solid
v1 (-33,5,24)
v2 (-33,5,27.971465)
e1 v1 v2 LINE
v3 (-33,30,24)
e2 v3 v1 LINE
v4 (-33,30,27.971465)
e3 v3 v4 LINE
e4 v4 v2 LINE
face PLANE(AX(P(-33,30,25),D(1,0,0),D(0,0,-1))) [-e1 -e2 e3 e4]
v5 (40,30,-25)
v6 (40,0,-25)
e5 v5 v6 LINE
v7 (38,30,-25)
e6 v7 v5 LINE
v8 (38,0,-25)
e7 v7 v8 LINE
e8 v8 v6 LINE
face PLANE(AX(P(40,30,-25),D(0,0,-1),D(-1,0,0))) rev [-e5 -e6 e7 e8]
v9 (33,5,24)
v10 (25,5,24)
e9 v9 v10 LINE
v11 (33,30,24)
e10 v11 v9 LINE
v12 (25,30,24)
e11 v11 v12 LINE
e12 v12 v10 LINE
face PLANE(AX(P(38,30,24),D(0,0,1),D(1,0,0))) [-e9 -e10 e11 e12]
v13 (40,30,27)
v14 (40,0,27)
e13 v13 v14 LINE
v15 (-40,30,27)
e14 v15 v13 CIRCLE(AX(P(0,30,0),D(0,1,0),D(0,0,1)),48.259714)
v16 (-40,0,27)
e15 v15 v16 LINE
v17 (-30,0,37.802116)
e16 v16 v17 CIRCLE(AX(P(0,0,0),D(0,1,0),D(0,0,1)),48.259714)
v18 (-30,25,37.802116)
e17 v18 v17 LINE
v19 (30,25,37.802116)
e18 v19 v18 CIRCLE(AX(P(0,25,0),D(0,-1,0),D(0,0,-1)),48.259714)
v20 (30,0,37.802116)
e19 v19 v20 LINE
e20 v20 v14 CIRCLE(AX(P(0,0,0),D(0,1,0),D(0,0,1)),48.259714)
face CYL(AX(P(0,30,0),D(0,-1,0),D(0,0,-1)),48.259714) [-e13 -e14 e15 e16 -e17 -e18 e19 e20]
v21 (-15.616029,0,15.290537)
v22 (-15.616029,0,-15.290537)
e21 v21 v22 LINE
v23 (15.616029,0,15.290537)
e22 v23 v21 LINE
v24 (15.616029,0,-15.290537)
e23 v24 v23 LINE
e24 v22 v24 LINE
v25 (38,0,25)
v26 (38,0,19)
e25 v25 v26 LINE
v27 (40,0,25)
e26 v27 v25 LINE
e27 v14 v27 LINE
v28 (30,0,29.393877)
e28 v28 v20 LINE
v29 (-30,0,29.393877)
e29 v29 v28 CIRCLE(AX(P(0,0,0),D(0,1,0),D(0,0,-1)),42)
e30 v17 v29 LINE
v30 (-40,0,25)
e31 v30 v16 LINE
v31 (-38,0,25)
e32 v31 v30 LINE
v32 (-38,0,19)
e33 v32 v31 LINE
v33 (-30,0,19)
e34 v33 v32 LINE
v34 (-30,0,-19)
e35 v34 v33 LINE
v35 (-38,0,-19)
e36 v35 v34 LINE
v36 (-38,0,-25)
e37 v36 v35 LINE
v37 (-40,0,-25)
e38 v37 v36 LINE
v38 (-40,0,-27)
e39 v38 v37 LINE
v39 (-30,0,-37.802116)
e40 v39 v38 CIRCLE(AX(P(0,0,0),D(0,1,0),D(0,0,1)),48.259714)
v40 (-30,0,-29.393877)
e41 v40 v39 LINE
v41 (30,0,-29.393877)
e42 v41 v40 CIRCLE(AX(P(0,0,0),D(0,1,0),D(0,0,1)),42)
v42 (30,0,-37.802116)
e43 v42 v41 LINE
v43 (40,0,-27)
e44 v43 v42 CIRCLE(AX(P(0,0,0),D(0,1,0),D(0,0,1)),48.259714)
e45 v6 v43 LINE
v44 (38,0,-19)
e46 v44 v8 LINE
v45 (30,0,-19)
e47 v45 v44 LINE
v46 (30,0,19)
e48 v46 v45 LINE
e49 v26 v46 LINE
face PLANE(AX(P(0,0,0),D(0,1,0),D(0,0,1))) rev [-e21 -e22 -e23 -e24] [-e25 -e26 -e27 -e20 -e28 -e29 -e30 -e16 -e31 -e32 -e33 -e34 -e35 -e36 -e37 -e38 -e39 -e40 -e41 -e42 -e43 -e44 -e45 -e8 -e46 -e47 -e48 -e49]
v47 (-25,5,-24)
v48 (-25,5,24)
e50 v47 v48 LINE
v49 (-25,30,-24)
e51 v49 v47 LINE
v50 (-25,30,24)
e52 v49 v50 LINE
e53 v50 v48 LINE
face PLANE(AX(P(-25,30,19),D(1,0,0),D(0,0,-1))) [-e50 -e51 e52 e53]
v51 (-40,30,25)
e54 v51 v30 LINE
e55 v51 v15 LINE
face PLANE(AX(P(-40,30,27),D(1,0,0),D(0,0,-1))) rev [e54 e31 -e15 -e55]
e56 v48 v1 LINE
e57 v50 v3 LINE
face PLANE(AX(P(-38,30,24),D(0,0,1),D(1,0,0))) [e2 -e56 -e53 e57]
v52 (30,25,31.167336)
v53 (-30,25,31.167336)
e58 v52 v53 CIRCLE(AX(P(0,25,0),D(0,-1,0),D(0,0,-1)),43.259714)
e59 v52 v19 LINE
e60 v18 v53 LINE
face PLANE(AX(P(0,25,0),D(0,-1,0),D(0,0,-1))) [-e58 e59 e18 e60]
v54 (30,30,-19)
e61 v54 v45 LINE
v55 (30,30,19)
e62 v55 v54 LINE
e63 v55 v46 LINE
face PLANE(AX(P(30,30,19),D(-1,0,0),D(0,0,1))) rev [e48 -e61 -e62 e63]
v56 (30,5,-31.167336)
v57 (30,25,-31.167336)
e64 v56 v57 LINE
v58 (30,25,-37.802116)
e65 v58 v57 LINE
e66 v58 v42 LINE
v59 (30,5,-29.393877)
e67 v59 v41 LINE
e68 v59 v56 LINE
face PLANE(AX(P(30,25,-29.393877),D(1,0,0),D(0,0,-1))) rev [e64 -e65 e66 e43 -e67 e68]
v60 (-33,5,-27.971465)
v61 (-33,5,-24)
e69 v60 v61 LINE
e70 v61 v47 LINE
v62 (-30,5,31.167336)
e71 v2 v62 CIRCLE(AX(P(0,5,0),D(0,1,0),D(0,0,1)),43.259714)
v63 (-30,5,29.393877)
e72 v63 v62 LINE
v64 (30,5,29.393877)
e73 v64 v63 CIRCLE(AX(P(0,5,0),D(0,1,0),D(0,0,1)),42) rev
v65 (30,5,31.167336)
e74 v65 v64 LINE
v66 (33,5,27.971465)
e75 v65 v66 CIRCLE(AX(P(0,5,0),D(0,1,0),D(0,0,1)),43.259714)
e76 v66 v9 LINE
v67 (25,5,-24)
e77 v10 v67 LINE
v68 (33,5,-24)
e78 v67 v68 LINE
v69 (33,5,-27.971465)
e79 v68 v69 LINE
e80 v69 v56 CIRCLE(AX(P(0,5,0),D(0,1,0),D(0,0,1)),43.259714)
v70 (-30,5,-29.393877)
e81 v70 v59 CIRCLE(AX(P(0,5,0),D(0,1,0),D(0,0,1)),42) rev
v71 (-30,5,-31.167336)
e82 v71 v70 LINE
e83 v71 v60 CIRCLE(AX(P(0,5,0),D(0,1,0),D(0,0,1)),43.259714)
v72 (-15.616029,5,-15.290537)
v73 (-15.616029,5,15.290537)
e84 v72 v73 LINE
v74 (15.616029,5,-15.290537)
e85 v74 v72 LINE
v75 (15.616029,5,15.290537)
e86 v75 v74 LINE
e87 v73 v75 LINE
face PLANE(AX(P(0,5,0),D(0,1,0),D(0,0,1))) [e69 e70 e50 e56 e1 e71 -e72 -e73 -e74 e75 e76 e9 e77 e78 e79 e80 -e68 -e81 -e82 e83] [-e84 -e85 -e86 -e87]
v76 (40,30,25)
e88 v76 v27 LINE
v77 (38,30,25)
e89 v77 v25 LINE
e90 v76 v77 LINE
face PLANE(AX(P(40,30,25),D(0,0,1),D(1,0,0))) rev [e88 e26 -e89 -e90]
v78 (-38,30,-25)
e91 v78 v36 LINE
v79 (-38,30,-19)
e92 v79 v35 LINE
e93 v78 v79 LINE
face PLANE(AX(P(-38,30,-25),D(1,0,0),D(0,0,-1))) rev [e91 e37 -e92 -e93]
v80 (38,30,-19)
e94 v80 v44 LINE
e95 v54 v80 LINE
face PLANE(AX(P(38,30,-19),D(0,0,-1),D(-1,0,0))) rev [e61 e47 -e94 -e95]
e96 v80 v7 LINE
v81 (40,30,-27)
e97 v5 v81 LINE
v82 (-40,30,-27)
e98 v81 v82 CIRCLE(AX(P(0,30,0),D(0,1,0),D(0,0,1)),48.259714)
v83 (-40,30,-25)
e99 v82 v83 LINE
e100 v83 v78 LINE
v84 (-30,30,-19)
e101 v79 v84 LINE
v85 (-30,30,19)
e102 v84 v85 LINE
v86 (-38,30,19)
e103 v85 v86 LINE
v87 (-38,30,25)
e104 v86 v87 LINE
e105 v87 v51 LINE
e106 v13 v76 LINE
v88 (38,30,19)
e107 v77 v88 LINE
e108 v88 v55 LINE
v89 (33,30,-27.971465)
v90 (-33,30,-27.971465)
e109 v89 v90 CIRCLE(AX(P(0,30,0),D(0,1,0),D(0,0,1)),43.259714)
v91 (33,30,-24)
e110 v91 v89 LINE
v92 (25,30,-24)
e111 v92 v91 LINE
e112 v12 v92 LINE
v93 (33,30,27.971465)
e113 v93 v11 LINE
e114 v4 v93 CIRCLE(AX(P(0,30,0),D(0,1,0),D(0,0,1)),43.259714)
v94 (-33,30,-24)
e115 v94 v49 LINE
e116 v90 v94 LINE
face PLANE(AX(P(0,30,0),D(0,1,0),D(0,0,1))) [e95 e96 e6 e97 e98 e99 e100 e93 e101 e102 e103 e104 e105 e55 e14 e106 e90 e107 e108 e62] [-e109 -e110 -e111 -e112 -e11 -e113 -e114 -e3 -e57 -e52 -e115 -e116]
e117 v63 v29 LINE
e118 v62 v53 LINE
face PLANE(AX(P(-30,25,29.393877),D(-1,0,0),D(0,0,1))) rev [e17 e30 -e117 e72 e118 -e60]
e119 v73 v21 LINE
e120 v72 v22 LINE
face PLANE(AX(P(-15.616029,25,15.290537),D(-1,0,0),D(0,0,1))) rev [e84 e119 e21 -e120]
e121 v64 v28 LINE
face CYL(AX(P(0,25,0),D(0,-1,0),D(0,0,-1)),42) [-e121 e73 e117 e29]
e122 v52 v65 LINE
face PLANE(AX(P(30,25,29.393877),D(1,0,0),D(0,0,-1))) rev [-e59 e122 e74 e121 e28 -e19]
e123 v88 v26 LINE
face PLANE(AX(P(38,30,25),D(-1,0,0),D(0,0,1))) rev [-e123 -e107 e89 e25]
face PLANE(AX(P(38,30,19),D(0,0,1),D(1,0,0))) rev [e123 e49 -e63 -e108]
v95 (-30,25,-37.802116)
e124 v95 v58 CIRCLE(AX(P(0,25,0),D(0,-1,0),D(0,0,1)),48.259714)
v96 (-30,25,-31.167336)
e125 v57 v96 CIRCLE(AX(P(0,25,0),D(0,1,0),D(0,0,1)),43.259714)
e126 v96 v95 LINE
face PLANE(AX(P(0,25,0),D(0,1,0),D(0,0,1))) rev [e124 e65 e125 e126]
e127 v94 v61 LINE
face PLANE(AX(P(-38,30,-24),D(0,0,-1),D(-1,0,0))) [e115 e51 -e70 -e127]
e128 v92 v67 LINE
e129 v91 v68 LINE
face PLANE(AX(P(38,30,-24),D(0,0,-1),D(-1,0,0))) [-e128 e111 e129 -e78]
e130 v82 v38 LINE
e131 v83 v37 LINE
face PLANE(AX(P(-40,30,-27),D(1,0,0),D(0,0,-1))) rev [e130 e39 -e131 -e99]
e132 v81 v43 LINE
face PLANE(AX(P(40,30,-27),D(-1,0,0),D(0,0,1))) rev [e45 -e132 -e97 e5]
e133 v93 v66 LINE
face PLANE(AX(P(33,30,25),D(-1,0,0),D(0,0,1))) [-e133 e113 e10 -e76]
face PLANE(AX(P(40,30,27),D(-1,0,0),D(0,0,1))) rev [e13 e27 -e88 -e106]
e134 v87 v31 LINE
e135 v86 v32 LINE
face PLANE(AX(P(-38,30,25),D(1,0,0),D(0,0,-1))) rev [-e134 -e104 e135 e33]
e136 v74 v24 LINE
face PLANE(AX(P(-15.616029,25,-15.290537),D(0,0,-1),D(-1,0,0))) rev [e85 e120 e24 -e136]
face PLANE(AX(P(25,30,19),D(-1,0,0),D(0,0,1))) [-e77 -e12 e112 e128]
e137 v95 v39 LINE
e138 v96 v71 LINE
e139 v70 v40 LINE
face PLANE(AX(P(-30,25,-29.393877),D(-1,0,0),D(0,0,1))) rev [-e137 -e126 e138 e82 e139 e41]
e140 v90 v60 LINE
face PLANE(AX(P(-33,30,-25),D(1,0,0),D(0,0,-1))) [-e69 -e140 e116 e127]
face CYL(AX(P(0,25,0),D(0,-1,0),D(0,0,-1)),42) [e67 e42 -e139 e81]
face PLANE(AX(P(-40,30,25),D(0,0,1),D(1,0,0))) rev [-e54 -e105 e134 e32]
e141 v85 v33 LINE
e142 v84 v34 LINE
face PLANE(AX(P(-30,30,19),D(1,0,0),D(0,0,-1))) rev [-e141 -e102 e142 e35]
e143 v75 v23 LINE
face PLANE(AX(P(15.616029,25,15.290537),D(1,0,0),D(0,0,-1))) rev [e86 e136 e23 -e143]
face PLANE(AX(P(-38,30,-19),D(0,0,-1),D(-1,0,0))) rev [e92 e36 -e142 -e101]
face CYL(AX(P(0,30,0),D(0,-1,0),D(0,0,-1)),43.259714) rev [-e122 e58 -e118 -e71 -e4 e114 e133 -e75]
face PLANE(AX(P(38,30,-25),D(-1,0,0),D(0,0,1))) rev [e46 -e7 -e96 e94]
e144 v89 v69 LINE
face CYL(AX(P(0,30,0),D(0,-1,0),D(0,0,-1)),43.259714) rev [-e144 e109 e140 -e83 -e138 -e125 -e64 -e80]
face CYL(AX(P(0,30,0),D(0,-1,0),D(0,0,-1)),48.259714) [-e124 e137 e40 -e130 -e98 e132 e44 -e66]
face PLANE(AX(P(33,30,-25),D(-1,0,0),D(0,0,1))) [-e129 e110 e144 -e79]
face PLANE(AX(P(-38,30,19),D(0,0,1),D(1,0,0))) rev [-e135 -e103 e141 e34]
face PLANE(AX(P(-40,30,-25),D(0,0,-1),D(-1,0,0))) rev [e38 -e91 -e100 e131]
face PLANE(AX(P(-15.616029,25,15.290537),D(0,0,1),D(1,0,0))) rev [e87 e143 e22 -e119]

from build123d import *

# Parameters (mm, degrees)
EXTRUDE_1_DEPTH     = 30
SHELL_START         = 5
SHELL_1_DEPTH       = 25
SKETCH_3_W          = 31.232058984
SKETCH_3_H          = 30.58107444
CUT_EXTRUDE_1_DEPTH = 25


# Read off the part's stored shape, not the designer's step: 抽壳1
with BuildPart() as part:
    # 草图1 → 凸台-拉伸1 (new body)
    with BuildSketch(Plane(origin=(0, 0, 0), x_dir=(1, 0, 0), z_dir=(0, 1, 0))):
        with BuildLine():
            Line((-40, -27), (-40, -25))
            Line((-40, -25), (-38, -25))
            Line((-38, -25), (-38, -19))
            Line((-38, -19), (-30, -19))
            Line((-30, -19), (-30, 19))
            Line((-30, 19), (-38, 19))
            Line((-38, 19), (-38, 25))
            Line((-38, 25), (-40, 25))
            Line((-40, 25), (-40, 27))
            ThreePointArc((-40, 27), (0, 48.259714048), (40, 27))
            Line((40, 27), (40, 25))
            Line((40, 25), (38, 25))
            Line((38, 25), (38, 19))
            Line((38, 19), (30, 19))
            Line((30, 19), (30, -19))
            Line((30, -19), (38, -19))
            Line((38, -19), (38, -25))
            Line((38, -25), (40, -25))
            Line((40, -25), (40, -27))
            ThreePointArc((40, -27), (0, -48.259714048), (-40, -27))
        make_face()
    extrude(amount=EXTRUDE_1_DEPTH)

    # 抽壳1 outline → 抽壳1 (cut)
    with BuildSketch(Plane(origin=(0, 0, 0), x_dir=(1, 0, 0), z_dir=(0, 1, 0)).offset(SHELL_START)):
        with BuildLine():
            Line((-33, -24), (-33, -27.971465094))
            ThreePointArc((-33, -27.971465094), (0, -43.259714048), (33, -27.971465094))
            Line((33, -27.971465094), (33, -24))
            Line((33, -24), (25, -24))
            Line((25, -24), (25, 24))
            Line((25, 24), (33, 24))
            Line((33, 24), (33, 27.971465094))
            ThreePointArc((33, 27.971465094), (0, 43.259714048), (-33, 27.971465094))
            Line((-33, 27.971465094), (-33, 24))
            Line((-33, 24), (-25, 24))
            Line((-25, 24), (-25, -24))
            Line((-25, -24), (-33, -24))
        make_face()
    extrude(amount=SHELL_1_DEPTH, mode=Mode.SUBTRACT)

    # 草图3 → 切除-拉伸1 (cut)
    with BuildSketch(Plane.XZ):
        with BuildLine():
            Line((-30, 29.393876913), (-30, 37.802116343))
            ThreePointArc((-30, 37.802116343), (0, 48.259714048), (30, 37.802116343))
            Line((30, 37.802116343), (30, 29.393876913))
            ThreePointArc((30, 29.393876913), (0, 42), (-30, 29.393876913))
        make_face()
        with BuildLine():
            Line((-30, -29.393876913), (-30, -37.802116343))
            ThreePointArc((-30, -37.802116343), (0, -48.259714048), (30, -37.802116343))
            Line((30, -37.802116343), (30, -29.393876913))
            ThreePointArc((30, -29.393876913), (0, -42), (-30, -29.393876913))
        make_face()
        Rectangle(SKETCH_3_W, SKETCH_3_H)
    extrude(amount=-CUT_EXTRUDE_1_DEPTH, mode=Mode.SUBTRACT)


solid = part.part
